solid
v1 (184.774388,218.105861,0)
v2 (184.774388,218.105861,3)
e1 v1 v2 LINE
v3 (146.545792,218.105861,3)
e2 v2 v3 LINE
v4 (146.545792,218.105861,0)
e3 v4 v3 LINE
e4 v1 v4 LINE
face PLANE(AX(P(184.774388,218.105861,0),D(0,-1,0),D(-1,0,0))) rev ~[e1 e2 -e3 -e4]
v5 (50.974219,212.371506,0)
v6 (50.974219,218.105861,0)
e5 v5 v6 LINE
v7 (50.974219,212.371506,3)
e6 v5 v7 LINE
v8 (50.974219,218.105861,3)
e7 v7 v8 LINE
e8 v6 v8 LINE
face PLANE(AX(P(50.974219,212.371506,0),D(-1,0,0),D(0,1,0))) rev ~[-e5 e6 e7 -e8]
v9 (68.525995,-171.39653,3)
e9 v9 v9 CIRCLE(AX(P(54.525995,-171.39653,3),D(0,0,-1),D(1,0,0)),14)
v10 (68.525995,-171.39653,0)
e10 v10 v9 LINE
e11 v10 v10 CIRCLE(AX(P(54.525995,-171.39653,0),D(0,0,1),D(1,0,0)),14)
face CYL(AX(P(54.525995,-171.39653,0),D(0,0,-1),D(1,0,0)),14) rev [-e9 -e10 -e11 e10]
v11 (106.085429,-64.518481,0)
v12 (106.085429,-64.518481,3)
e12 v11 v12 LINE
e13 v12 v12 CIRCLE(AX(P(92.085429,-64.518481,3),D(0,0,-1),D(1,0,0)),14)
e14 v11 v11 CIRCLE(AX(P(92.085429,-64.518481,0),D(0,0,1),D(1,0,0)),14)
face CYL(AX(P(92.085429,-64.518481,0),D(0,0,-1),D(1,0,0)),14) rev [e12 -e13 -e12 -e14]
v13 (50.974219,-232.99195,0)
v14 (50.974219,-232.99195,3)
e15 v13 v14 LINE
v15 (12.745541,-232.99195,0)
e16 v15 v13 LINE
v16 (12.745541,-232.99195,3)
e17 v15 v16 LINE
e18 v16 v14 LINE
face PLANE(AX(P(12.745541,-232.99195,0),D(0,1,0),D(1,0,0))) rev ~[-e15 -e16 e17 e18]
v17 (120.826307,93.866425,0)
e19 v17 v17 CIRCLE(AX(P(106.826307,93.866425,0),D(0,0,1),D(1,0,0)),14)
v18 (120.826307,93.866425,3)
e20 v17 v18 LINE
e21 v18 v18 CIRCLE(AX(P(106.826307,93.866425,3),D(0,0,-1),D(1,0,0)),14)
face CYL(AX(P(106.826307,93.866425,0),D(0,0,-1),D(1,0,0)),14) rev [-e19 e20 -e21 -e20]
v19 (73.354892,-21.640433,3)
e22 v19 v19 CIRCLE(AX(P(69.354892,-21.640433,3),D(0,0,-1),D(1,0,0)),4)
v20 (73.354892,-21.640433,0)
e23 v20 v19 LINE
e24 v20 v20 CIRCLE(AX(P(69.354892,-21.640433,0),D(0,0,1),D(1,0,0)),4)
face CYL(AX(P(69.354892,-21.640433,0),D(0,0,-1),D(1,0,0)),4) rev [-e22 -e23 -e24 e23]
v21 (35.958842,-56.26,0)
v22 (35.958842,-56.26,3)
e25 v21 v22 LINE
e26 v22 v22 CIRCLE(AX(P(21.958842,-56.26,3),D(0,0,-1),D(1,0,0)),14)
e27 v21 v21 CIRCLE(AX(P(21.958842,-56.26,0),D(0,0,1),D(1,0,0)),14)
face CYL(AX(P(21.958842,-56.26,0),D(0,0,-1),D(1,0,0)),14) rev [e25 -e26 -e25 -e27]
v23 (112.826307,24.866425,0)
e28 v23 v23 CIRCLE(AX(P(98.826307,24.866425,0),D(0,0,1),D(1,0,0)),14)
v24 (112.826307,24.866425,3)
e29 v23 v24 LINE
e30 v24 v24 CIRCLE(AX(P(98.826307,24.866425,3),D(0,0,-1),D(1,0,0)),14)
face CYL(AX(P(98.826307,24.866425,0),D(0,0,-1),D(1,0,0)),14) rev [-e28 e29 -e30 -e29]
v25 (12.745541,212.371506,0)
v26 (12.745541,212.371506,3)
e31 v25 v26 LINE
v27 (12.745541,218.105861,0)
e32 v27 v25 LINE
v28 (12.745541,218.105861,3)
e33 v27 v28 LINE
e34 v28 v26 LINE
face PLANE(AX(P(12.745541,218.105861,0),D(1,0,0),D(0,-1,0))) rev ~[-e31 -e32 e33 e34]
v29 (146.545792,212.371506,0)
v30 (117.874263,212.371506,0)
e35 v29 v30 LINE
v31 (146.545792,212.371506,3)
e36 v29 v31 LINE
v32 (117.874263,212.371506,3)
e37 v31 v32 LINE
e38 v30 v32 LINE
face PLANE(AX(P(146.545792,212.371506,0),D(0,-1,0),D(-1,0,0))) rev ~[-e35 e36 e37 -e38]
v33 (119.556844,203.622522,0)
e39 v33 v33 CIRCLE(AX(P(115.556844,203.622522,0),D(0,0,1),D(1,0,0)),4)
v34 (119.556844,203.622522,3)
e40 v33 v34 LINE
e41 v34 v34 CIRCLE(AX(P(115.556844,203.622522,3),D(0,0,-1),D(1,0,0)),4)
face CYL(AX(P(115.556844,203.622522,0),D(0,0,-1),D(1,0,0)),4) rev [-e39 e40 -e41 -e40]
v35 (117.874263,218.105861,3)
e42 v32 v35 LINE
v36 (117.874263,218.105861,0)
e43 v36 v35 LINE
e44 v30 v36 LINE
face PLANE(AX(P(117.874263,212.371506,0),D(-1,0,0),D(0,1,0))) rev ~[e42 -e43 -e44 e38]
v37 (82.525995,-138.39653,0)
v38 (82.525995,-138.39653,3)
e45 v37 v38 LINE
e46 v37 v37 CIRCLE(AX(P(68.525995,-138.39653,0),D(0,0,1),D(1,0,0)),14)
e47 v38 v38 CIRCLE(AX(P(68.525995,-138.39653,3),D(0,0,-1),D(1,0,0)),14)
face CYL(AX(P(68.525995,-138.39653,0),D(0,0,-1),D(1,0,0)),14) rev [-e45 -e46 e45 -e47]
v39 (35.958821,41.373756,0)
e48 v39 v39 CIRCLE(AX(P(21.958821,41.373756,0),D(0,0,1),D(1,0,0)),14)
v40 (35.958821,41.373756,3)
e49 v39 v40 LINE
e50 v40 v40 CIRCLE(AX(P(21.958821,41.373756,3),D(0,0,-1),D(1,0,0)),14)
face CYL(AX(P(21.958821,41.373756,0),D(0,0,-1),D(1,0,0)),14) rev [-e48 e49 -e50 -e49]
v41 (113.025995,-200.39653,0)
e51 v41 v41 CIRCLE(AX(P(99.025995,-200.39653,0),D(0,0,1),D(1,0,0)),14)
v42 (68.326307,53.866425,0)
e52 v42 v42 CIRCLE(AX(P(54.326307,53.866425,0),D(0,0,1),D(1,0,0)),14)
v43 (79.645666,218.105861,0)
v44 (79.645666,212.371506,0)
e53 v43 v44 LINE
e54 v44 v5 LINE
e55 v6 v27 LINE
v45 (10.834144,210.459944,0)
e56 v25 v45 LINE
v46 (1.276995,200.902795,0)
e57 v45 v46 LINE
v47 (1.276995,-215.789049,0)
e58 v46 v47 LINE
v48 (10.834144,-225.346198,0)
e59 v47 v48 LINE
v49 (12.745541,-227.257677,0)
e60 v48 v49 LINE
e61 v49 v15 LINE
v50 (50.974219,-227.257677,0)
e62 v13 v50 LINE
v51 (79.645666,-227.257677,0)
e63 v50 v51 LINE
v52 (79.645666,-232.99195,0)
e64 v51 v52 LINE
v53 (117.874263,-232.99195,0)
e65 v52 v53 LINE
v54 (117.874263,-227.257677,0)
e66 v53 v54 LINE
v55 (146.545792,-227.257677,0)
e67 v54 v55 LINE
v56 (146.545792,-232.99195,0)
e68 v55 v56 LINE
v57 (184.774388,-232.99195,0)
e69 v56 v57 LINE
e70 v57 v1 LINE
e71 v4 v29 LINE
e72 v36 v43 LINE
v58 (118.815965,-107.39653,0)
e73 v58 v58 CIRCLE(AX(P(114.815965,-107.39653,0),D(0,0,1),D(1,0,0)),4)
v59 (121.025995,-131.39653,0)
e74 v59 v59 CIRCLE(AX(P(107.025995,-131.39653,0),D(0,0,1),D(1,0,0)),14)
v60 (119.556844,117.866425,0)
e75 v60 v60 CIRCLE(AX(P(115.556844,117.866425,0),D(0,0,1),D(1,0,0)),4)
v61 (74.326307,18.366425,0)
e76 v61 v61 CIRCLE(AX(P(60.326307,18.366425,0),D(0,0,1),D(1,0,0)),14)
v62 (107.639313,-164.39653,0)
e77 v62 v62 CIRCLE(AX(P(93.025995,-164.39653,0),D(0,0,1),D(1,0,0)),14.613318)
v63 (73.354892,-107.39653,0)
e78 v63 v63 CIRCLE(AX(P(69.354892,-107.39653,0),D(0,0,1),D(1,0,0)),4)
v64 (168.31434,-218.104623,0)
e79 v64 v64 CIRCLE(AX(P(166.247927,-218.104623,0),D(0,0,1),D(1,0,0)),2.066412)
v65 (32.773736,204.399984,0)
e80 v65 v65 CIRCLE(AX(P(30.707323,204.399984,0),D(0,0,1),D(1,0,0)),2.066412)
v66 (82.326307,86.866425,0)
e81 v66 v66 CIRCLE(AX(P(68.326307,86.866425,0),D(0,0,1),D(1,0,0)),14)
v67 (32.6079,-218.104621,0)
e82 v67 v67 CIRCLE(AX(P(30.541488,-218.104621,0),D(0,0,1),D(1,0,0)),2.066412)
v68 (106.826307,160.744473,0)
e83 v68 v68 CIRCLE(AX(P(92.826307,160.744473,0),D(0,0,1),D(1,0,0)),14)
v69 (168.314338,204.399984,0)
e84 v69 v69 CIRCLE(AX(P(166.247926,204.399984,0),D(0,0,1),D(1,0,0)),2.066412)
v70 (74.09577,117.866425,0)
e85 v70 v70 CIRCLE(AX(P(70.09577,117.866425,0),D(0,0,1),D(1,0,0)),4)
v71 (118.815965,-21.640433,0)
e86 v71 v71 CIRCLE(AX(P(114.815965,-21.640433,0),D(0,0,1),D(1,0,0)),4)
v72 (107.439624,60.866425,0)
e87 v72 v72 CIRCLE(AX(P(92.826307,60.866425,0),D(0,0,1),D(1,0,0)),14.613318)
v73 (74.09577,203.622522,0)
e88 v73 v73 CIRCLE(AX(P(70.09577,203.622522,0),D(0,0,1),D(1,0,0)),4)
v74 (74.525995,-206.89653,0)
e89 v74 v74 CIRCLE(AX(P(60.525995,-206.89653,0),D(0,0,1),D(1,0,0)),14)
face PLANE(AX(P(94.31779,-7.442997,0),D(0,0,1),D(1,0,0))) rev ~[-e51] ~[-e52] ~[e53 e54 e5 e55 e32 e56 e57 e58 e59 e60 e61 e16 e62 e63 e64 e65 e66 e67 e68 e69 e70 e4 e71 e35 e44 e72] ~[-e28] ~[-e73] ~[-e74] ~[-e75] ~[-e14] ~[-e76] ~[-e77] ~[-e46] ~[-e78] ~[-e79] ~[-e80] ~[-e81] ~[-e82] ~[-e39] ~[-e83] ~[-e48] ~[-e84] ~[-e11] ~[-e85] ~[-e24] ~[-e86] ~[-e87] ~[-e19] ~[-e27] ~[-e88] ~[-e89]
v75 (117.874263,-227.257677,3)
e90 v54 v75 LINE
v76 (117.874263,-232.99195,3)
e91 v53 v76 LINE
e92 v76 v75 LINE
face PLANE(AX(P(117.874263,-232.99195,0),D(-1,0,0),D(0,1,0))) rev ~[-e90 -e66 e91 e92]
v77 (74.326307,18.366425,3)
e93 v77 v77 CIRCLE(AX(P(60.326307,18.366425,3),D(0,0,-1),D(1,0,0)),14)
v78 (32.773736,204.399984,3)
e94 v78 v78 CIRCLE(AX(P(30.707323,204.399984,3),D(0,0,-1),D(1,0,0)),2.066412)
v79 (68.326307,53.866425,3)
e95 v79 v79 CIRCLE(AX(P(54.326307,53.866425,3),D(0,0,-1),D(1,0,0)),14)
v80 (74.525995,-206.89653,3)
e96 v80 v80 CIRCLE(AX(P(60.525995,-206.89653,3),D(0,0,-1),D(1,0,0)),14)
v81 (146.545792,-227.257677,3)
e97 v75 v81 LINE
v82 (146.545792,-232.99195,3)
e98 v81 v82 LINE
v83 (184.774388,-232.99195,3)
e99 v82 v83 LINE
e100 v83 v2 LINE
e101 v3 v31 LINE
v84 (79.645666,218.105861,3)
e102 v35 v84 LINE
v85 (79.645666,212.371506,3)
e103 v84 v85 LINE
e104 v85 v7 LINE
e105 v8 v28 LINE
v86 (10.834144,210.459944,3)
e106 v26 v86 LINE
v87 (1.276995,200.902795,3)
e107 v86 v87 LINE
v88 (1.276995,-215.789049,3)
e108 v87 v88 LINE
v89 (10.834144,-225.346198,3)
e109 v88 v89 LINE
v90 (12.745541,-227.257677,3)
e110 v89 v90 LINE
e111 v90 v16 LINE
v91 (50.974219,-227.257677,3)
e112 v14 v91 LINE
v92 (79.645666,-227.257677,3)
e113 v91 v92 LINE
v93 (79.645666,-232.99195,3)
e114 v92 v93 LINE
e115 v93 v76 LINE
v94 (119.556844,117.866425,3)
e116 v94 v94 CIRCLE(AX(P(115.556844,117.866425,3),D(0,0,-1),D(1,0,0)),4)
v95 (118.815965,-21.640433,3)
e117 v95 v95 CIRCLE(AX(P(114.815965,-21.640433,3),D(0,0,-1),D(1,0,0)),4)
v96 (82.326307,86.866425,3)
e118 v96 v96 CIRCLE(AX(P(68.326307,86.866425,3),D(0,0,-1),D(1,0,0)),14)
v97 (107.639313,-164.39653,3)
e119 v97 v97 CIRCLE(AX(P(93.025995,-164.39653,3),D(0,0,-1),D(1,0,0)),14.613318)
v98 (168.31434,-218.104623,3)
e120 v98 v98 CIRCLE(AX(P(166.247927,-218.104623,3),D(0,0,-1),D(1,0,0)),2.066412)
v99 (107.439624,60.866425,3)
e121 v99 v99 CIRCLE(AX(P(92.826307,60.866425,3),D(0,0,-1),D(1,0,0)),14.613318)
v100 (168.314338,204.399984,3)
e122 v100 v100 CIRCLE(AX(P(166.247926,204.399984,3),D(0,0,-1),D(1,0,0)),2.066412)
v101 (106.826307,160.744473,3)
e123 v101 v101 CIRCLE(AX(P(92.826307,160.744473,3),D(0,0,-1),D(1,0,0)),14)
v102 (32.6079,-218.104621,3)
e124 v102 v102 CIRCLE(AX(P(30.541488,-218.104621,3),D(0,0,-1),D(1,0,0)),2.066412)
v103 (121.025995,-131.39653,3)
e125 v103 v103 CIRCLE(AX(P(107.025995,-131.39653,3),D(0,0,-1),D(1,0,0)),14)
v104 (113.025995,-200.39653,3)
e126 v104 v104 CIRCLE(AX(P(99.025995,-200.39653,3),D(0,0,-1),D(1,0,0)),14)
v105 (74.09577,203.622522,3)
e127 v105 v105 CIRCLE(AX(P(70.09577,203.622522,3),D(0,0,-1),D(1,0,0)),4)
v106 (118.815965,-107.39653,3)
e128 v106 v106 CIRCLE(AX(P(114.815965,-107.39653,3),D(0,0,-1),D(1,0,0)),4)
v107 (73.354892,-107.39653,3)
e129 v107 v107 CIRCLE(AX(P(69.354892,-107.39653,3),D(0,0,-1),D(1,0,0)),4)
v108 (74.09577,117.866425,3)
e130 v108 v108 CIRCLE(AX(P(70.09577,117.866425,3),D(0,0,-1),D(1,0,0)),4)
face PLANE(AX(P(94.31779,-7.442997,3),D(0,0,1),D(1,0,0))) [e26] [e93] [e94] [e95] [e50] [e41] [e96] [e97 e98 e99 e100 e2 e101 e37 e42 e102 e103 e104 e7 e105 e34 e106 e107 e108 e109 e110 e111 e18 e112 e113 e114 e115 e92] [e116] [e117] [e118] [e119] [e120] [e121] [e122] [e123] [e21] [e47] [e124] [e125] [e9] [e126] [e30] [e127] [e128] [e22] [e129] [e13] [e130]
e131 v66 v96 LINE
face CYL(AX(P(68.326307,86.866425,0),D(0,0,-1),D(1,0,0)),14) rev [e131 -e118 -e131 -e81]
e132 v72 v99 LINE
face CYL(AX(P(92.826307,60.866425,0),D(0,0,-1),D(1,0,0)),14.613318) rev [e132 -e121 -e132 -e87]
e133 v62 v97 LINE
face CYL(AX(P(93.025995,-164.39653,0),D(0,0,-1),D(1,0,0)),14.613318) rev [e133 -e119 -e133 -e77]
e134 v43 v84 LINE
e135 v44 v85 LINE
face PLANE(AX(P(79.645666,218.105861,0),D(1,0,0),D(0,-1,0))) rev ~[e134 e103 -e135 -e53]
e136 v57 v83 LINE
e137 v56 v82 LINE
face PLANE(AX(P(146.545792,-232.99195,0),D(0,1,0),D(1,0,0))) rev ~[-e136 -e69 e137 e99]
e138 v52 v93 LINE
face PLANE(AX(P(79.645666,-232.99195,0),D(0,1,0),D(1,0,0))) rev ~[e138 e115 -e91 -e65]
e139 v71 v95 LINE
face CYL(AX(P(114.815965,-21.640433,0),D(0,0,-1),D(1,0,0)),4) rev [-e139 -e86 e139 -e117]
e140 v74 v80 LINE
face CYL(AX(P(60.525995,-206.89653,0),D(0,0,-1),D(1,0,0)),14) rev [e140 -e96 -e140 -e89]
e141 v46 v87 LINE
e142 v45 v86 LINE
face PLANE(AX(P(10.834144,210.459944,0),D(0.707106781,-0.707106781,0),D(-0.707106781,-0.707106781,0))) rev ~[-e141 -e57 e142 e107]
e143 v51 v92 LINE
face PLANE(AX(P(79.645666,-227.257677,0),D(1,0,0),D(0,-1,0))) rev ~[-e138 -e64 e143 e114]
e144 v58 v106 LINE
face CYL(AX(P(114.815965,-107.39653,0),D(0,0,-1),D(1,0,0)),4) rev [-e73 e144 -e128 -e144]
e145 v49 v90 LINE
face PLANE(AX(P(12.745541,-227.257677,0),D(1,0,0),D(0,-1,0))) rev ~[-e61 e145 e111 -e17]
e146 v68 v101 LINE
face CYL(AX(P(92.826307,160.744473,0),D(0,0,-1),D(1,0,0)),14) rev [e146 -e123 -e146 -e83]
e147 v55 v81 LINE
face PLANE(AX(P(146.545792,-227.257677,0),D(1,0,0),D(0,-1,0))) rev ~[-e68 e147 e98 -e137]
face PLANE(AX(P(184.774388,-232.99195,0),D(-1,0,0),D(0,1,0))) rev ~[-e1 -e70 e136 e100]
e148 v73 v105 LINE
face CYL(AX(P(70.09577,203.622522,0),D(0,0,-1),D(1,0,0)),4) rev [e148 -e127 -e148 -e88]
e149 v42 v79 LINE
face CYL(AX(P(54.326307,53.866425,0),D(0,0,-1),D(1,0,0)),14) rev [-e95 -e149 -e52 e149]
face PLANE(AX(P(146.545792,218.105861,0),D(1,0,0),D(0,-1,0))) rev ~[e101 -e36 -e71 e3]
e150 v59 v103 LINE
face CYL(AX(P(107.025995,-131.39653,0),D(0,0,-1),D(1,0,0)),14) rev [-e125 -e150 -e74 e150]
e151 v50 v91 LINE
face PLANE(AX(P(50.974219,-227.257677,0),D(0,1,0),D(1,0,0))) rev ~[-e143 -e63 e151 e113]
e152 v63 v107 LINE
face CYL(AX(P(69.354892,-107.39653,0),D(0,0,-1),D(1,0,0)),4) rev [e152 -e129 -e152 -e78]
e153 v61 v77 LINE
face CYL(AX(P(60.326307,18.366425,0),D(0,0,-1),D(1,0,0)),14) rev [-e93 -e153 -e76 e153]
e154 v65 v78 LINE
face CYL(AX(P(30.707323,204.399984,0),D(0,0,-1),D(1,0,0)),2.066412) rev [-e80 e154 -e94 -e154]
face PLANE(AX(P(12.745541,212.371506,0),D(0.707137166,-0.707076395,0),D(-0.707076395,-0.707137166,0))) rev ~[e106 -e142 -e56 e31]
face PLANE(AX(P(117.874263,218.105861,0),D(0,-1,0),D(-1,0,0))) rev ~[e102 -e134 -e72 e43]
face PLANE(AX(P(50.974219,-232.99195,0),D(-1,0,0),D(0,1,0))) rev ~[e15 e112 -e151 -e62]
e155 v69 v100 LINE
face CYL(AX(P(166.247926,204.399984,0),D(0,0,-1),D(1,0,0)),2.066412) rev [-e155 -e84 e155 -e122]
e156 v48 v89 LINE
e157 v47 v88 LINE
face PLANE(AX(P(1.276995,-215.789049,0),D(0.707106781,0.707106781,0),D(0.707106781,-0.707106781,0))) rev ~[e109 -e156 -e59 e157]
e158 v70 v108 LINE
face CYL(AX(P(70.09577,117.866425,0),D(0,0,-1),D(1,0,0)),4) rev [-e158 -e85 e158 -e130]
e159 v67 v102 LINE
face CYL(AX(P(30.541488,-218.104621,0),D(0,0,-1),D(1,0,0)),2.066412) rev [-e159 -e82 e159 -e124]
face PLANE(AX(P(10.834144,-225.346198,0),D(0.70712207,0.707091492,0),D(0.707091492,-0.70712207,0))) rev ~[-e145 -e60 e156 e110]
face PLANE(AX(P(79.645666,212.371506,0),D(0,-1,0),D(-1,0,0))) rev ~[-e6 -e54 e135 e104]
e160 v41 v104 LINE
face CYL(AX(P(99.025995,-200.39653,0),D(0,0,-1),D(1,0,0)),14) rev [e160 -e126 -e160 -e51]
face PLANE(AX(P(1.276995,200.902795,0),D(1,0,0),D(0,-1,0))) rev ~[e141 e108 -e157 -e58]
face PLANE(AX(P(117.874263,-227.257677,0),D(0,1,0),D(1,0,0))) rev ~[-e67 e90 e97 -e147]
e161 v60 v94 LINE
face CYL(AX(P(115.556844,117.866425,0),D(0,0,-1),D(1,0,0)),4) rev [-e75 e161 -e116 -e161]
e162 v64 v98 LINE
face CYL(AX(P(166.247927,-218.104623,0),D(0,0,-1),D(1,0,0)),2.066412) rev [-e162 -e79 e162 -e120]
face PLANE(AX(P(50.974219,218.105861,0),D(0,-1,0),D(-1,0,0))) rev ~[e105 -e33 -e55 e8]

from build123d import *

# Parameters (mm, degrees)
F4_DEPTH = 3
F0_R     = 2.0664121369
F0_R_2   = 4
F0_R_3   = 14
F1_R     = 14
F1_R_2   = 14.6133175352
F1_R_3   = 4
F2_R     = 14
F5_DEPTH = 25


# Not quite as in the source:
# - ends of sketch curves that miss each other by under 0.0002 mm in the source are joined


with BuildPart() as f4:
    # F3 (on Top) → F4 (new body)
    with BuildSketch(Plane.XY):
        Polygon((1.2769951565, 200.9027954419), (1.2769951565, -215.7890487216), (10.8341440573, -225.3461976224), (12.7455411882, -227.2576774098), (12.7455411882, -232.9919504256), (50.9742194479, -232.9919504256), (50.9742194479, -227.2576774098), (79.6456661504, -227.2576774098), (79.6456661504, -232.9919504256), (117.8742627869, -232.9919504256), (117.8742627869, -227.2576774098), (146.5457921458, -227.2576774098), (146.5457921458, -232.9919504256), (184.774387749, -232.9919504256), (184.774387749, -227.2576774098), (184.774387749, 212.3715057533), (184.774387749, 218.1058614256), (146.5457921458, 218.1058614256), (146.5457921458, 212.3715057533), (117.8742627869, 212.3715057533), (117.8742627869, 218.1058614256), (79.6456661504, 218.1058614256), (79.6456661504, 212.3715057533), (50.9742194479, 212.3715057533), (50.9742194479, 218.1058614256), (12.7455411882, 218.1058614256), (12.7455411882, 212.3715057533), (10.8341440573, 210.4599443427), align=None)
    extrude(amount=F4_DEPTH)

    # F0 (on Top) + F1 (on Top) + F2 (on Top) → F5 (cut)
    with BuildSketch(Plane.XY):
        with Locations((30.7073234506, 204.3999841099)):
            Circle(F0_R)
        with Locations((70.0957699559, 203.6225220796)):
            Circle(F0_R_2)
        with Locations((115.556843684, 203.6225220796)):
            Circle(F0_R_2)
        with Locations((166.2479263408, 204.3999841099)):
            Circle(F0_R)
        with Locations((92.8263068199, 160.7444733381)):
            Circle(F0_R_3)
        with Locations((70.0957699559, 117.8664245966)):
            Circle(F0_R_2)
        with Locations((115.556843684, 117.8664245966)):
            Circle(F0_R_2)
        with Locations((30.5414876774, -218.1046205684)):
            Circle(F0_R)
        with Locations((166.247927374, -218.1046226348)):
            Circle(F0_R)
    with BuildSketch(Plane.XY):
        with Locations((106.8263068199, 93.8664245966)):
            Circle(F1_R)
        with Locations((68.3263068199, 86.8664245966)):
            Circle(F1_R)
        with Locations((92.8263068199, 60.8664245966)):
            Circle(F1_R_2)
        with Locations((98.8263068199, 24.8664245966)):
            Circle(F1_R)
        with Locations((54.3263068199, 53.8664245966)):
            Circle(F1_R)
        with Locations((60.3263068199, 18.3664245966)):
            Circle(F1_R)
        with Locations((107.0259951565, -131.3965302345)):
            Circle(F1_R)
        with Locations((68.5259951565, -138.3965302345)):
            Circle(F1_R)
        with Locations((54.5259951565, -171.3965302345)):
            Circle(F1_R)
        with Locations((93.0259951565, -164.3965302345)):
            Circle(F1_R_2)
        with Locations((99.0259951565, -200.3965302345)):
            Circle(F1_R)
        with Locations((60.5259951565, -206.8965302345)):
            Circle(F1_R)
        with Locations((92.0854285359, -64.518481493)):
            Circle(F1_R)
        with Locations((69.3548916719, -21.6404327515)):
            Circle(F1_R_3)
        with Locations((114.8159654, -21.6404327515)):
            Circle(F1_R_3)
        with Locations((114.8159654, -107.3965302345)):
            Circle(F1_R_3)
        with Locations((69.3548916719, -107.3965302345)):
            Circle(F1_R_3)
    with BuildSketch(Plane.XY):
        with Locations((21.9588205218, 41.3737557828)):
            Circle(F2_R)
        with Locations((21.9588422365, -56.2599998629)):
            Circle(F2_R)
    extrude(amount=F5_DEPTH, mode=Mode.SUBTRACT)


solid = f4.part
